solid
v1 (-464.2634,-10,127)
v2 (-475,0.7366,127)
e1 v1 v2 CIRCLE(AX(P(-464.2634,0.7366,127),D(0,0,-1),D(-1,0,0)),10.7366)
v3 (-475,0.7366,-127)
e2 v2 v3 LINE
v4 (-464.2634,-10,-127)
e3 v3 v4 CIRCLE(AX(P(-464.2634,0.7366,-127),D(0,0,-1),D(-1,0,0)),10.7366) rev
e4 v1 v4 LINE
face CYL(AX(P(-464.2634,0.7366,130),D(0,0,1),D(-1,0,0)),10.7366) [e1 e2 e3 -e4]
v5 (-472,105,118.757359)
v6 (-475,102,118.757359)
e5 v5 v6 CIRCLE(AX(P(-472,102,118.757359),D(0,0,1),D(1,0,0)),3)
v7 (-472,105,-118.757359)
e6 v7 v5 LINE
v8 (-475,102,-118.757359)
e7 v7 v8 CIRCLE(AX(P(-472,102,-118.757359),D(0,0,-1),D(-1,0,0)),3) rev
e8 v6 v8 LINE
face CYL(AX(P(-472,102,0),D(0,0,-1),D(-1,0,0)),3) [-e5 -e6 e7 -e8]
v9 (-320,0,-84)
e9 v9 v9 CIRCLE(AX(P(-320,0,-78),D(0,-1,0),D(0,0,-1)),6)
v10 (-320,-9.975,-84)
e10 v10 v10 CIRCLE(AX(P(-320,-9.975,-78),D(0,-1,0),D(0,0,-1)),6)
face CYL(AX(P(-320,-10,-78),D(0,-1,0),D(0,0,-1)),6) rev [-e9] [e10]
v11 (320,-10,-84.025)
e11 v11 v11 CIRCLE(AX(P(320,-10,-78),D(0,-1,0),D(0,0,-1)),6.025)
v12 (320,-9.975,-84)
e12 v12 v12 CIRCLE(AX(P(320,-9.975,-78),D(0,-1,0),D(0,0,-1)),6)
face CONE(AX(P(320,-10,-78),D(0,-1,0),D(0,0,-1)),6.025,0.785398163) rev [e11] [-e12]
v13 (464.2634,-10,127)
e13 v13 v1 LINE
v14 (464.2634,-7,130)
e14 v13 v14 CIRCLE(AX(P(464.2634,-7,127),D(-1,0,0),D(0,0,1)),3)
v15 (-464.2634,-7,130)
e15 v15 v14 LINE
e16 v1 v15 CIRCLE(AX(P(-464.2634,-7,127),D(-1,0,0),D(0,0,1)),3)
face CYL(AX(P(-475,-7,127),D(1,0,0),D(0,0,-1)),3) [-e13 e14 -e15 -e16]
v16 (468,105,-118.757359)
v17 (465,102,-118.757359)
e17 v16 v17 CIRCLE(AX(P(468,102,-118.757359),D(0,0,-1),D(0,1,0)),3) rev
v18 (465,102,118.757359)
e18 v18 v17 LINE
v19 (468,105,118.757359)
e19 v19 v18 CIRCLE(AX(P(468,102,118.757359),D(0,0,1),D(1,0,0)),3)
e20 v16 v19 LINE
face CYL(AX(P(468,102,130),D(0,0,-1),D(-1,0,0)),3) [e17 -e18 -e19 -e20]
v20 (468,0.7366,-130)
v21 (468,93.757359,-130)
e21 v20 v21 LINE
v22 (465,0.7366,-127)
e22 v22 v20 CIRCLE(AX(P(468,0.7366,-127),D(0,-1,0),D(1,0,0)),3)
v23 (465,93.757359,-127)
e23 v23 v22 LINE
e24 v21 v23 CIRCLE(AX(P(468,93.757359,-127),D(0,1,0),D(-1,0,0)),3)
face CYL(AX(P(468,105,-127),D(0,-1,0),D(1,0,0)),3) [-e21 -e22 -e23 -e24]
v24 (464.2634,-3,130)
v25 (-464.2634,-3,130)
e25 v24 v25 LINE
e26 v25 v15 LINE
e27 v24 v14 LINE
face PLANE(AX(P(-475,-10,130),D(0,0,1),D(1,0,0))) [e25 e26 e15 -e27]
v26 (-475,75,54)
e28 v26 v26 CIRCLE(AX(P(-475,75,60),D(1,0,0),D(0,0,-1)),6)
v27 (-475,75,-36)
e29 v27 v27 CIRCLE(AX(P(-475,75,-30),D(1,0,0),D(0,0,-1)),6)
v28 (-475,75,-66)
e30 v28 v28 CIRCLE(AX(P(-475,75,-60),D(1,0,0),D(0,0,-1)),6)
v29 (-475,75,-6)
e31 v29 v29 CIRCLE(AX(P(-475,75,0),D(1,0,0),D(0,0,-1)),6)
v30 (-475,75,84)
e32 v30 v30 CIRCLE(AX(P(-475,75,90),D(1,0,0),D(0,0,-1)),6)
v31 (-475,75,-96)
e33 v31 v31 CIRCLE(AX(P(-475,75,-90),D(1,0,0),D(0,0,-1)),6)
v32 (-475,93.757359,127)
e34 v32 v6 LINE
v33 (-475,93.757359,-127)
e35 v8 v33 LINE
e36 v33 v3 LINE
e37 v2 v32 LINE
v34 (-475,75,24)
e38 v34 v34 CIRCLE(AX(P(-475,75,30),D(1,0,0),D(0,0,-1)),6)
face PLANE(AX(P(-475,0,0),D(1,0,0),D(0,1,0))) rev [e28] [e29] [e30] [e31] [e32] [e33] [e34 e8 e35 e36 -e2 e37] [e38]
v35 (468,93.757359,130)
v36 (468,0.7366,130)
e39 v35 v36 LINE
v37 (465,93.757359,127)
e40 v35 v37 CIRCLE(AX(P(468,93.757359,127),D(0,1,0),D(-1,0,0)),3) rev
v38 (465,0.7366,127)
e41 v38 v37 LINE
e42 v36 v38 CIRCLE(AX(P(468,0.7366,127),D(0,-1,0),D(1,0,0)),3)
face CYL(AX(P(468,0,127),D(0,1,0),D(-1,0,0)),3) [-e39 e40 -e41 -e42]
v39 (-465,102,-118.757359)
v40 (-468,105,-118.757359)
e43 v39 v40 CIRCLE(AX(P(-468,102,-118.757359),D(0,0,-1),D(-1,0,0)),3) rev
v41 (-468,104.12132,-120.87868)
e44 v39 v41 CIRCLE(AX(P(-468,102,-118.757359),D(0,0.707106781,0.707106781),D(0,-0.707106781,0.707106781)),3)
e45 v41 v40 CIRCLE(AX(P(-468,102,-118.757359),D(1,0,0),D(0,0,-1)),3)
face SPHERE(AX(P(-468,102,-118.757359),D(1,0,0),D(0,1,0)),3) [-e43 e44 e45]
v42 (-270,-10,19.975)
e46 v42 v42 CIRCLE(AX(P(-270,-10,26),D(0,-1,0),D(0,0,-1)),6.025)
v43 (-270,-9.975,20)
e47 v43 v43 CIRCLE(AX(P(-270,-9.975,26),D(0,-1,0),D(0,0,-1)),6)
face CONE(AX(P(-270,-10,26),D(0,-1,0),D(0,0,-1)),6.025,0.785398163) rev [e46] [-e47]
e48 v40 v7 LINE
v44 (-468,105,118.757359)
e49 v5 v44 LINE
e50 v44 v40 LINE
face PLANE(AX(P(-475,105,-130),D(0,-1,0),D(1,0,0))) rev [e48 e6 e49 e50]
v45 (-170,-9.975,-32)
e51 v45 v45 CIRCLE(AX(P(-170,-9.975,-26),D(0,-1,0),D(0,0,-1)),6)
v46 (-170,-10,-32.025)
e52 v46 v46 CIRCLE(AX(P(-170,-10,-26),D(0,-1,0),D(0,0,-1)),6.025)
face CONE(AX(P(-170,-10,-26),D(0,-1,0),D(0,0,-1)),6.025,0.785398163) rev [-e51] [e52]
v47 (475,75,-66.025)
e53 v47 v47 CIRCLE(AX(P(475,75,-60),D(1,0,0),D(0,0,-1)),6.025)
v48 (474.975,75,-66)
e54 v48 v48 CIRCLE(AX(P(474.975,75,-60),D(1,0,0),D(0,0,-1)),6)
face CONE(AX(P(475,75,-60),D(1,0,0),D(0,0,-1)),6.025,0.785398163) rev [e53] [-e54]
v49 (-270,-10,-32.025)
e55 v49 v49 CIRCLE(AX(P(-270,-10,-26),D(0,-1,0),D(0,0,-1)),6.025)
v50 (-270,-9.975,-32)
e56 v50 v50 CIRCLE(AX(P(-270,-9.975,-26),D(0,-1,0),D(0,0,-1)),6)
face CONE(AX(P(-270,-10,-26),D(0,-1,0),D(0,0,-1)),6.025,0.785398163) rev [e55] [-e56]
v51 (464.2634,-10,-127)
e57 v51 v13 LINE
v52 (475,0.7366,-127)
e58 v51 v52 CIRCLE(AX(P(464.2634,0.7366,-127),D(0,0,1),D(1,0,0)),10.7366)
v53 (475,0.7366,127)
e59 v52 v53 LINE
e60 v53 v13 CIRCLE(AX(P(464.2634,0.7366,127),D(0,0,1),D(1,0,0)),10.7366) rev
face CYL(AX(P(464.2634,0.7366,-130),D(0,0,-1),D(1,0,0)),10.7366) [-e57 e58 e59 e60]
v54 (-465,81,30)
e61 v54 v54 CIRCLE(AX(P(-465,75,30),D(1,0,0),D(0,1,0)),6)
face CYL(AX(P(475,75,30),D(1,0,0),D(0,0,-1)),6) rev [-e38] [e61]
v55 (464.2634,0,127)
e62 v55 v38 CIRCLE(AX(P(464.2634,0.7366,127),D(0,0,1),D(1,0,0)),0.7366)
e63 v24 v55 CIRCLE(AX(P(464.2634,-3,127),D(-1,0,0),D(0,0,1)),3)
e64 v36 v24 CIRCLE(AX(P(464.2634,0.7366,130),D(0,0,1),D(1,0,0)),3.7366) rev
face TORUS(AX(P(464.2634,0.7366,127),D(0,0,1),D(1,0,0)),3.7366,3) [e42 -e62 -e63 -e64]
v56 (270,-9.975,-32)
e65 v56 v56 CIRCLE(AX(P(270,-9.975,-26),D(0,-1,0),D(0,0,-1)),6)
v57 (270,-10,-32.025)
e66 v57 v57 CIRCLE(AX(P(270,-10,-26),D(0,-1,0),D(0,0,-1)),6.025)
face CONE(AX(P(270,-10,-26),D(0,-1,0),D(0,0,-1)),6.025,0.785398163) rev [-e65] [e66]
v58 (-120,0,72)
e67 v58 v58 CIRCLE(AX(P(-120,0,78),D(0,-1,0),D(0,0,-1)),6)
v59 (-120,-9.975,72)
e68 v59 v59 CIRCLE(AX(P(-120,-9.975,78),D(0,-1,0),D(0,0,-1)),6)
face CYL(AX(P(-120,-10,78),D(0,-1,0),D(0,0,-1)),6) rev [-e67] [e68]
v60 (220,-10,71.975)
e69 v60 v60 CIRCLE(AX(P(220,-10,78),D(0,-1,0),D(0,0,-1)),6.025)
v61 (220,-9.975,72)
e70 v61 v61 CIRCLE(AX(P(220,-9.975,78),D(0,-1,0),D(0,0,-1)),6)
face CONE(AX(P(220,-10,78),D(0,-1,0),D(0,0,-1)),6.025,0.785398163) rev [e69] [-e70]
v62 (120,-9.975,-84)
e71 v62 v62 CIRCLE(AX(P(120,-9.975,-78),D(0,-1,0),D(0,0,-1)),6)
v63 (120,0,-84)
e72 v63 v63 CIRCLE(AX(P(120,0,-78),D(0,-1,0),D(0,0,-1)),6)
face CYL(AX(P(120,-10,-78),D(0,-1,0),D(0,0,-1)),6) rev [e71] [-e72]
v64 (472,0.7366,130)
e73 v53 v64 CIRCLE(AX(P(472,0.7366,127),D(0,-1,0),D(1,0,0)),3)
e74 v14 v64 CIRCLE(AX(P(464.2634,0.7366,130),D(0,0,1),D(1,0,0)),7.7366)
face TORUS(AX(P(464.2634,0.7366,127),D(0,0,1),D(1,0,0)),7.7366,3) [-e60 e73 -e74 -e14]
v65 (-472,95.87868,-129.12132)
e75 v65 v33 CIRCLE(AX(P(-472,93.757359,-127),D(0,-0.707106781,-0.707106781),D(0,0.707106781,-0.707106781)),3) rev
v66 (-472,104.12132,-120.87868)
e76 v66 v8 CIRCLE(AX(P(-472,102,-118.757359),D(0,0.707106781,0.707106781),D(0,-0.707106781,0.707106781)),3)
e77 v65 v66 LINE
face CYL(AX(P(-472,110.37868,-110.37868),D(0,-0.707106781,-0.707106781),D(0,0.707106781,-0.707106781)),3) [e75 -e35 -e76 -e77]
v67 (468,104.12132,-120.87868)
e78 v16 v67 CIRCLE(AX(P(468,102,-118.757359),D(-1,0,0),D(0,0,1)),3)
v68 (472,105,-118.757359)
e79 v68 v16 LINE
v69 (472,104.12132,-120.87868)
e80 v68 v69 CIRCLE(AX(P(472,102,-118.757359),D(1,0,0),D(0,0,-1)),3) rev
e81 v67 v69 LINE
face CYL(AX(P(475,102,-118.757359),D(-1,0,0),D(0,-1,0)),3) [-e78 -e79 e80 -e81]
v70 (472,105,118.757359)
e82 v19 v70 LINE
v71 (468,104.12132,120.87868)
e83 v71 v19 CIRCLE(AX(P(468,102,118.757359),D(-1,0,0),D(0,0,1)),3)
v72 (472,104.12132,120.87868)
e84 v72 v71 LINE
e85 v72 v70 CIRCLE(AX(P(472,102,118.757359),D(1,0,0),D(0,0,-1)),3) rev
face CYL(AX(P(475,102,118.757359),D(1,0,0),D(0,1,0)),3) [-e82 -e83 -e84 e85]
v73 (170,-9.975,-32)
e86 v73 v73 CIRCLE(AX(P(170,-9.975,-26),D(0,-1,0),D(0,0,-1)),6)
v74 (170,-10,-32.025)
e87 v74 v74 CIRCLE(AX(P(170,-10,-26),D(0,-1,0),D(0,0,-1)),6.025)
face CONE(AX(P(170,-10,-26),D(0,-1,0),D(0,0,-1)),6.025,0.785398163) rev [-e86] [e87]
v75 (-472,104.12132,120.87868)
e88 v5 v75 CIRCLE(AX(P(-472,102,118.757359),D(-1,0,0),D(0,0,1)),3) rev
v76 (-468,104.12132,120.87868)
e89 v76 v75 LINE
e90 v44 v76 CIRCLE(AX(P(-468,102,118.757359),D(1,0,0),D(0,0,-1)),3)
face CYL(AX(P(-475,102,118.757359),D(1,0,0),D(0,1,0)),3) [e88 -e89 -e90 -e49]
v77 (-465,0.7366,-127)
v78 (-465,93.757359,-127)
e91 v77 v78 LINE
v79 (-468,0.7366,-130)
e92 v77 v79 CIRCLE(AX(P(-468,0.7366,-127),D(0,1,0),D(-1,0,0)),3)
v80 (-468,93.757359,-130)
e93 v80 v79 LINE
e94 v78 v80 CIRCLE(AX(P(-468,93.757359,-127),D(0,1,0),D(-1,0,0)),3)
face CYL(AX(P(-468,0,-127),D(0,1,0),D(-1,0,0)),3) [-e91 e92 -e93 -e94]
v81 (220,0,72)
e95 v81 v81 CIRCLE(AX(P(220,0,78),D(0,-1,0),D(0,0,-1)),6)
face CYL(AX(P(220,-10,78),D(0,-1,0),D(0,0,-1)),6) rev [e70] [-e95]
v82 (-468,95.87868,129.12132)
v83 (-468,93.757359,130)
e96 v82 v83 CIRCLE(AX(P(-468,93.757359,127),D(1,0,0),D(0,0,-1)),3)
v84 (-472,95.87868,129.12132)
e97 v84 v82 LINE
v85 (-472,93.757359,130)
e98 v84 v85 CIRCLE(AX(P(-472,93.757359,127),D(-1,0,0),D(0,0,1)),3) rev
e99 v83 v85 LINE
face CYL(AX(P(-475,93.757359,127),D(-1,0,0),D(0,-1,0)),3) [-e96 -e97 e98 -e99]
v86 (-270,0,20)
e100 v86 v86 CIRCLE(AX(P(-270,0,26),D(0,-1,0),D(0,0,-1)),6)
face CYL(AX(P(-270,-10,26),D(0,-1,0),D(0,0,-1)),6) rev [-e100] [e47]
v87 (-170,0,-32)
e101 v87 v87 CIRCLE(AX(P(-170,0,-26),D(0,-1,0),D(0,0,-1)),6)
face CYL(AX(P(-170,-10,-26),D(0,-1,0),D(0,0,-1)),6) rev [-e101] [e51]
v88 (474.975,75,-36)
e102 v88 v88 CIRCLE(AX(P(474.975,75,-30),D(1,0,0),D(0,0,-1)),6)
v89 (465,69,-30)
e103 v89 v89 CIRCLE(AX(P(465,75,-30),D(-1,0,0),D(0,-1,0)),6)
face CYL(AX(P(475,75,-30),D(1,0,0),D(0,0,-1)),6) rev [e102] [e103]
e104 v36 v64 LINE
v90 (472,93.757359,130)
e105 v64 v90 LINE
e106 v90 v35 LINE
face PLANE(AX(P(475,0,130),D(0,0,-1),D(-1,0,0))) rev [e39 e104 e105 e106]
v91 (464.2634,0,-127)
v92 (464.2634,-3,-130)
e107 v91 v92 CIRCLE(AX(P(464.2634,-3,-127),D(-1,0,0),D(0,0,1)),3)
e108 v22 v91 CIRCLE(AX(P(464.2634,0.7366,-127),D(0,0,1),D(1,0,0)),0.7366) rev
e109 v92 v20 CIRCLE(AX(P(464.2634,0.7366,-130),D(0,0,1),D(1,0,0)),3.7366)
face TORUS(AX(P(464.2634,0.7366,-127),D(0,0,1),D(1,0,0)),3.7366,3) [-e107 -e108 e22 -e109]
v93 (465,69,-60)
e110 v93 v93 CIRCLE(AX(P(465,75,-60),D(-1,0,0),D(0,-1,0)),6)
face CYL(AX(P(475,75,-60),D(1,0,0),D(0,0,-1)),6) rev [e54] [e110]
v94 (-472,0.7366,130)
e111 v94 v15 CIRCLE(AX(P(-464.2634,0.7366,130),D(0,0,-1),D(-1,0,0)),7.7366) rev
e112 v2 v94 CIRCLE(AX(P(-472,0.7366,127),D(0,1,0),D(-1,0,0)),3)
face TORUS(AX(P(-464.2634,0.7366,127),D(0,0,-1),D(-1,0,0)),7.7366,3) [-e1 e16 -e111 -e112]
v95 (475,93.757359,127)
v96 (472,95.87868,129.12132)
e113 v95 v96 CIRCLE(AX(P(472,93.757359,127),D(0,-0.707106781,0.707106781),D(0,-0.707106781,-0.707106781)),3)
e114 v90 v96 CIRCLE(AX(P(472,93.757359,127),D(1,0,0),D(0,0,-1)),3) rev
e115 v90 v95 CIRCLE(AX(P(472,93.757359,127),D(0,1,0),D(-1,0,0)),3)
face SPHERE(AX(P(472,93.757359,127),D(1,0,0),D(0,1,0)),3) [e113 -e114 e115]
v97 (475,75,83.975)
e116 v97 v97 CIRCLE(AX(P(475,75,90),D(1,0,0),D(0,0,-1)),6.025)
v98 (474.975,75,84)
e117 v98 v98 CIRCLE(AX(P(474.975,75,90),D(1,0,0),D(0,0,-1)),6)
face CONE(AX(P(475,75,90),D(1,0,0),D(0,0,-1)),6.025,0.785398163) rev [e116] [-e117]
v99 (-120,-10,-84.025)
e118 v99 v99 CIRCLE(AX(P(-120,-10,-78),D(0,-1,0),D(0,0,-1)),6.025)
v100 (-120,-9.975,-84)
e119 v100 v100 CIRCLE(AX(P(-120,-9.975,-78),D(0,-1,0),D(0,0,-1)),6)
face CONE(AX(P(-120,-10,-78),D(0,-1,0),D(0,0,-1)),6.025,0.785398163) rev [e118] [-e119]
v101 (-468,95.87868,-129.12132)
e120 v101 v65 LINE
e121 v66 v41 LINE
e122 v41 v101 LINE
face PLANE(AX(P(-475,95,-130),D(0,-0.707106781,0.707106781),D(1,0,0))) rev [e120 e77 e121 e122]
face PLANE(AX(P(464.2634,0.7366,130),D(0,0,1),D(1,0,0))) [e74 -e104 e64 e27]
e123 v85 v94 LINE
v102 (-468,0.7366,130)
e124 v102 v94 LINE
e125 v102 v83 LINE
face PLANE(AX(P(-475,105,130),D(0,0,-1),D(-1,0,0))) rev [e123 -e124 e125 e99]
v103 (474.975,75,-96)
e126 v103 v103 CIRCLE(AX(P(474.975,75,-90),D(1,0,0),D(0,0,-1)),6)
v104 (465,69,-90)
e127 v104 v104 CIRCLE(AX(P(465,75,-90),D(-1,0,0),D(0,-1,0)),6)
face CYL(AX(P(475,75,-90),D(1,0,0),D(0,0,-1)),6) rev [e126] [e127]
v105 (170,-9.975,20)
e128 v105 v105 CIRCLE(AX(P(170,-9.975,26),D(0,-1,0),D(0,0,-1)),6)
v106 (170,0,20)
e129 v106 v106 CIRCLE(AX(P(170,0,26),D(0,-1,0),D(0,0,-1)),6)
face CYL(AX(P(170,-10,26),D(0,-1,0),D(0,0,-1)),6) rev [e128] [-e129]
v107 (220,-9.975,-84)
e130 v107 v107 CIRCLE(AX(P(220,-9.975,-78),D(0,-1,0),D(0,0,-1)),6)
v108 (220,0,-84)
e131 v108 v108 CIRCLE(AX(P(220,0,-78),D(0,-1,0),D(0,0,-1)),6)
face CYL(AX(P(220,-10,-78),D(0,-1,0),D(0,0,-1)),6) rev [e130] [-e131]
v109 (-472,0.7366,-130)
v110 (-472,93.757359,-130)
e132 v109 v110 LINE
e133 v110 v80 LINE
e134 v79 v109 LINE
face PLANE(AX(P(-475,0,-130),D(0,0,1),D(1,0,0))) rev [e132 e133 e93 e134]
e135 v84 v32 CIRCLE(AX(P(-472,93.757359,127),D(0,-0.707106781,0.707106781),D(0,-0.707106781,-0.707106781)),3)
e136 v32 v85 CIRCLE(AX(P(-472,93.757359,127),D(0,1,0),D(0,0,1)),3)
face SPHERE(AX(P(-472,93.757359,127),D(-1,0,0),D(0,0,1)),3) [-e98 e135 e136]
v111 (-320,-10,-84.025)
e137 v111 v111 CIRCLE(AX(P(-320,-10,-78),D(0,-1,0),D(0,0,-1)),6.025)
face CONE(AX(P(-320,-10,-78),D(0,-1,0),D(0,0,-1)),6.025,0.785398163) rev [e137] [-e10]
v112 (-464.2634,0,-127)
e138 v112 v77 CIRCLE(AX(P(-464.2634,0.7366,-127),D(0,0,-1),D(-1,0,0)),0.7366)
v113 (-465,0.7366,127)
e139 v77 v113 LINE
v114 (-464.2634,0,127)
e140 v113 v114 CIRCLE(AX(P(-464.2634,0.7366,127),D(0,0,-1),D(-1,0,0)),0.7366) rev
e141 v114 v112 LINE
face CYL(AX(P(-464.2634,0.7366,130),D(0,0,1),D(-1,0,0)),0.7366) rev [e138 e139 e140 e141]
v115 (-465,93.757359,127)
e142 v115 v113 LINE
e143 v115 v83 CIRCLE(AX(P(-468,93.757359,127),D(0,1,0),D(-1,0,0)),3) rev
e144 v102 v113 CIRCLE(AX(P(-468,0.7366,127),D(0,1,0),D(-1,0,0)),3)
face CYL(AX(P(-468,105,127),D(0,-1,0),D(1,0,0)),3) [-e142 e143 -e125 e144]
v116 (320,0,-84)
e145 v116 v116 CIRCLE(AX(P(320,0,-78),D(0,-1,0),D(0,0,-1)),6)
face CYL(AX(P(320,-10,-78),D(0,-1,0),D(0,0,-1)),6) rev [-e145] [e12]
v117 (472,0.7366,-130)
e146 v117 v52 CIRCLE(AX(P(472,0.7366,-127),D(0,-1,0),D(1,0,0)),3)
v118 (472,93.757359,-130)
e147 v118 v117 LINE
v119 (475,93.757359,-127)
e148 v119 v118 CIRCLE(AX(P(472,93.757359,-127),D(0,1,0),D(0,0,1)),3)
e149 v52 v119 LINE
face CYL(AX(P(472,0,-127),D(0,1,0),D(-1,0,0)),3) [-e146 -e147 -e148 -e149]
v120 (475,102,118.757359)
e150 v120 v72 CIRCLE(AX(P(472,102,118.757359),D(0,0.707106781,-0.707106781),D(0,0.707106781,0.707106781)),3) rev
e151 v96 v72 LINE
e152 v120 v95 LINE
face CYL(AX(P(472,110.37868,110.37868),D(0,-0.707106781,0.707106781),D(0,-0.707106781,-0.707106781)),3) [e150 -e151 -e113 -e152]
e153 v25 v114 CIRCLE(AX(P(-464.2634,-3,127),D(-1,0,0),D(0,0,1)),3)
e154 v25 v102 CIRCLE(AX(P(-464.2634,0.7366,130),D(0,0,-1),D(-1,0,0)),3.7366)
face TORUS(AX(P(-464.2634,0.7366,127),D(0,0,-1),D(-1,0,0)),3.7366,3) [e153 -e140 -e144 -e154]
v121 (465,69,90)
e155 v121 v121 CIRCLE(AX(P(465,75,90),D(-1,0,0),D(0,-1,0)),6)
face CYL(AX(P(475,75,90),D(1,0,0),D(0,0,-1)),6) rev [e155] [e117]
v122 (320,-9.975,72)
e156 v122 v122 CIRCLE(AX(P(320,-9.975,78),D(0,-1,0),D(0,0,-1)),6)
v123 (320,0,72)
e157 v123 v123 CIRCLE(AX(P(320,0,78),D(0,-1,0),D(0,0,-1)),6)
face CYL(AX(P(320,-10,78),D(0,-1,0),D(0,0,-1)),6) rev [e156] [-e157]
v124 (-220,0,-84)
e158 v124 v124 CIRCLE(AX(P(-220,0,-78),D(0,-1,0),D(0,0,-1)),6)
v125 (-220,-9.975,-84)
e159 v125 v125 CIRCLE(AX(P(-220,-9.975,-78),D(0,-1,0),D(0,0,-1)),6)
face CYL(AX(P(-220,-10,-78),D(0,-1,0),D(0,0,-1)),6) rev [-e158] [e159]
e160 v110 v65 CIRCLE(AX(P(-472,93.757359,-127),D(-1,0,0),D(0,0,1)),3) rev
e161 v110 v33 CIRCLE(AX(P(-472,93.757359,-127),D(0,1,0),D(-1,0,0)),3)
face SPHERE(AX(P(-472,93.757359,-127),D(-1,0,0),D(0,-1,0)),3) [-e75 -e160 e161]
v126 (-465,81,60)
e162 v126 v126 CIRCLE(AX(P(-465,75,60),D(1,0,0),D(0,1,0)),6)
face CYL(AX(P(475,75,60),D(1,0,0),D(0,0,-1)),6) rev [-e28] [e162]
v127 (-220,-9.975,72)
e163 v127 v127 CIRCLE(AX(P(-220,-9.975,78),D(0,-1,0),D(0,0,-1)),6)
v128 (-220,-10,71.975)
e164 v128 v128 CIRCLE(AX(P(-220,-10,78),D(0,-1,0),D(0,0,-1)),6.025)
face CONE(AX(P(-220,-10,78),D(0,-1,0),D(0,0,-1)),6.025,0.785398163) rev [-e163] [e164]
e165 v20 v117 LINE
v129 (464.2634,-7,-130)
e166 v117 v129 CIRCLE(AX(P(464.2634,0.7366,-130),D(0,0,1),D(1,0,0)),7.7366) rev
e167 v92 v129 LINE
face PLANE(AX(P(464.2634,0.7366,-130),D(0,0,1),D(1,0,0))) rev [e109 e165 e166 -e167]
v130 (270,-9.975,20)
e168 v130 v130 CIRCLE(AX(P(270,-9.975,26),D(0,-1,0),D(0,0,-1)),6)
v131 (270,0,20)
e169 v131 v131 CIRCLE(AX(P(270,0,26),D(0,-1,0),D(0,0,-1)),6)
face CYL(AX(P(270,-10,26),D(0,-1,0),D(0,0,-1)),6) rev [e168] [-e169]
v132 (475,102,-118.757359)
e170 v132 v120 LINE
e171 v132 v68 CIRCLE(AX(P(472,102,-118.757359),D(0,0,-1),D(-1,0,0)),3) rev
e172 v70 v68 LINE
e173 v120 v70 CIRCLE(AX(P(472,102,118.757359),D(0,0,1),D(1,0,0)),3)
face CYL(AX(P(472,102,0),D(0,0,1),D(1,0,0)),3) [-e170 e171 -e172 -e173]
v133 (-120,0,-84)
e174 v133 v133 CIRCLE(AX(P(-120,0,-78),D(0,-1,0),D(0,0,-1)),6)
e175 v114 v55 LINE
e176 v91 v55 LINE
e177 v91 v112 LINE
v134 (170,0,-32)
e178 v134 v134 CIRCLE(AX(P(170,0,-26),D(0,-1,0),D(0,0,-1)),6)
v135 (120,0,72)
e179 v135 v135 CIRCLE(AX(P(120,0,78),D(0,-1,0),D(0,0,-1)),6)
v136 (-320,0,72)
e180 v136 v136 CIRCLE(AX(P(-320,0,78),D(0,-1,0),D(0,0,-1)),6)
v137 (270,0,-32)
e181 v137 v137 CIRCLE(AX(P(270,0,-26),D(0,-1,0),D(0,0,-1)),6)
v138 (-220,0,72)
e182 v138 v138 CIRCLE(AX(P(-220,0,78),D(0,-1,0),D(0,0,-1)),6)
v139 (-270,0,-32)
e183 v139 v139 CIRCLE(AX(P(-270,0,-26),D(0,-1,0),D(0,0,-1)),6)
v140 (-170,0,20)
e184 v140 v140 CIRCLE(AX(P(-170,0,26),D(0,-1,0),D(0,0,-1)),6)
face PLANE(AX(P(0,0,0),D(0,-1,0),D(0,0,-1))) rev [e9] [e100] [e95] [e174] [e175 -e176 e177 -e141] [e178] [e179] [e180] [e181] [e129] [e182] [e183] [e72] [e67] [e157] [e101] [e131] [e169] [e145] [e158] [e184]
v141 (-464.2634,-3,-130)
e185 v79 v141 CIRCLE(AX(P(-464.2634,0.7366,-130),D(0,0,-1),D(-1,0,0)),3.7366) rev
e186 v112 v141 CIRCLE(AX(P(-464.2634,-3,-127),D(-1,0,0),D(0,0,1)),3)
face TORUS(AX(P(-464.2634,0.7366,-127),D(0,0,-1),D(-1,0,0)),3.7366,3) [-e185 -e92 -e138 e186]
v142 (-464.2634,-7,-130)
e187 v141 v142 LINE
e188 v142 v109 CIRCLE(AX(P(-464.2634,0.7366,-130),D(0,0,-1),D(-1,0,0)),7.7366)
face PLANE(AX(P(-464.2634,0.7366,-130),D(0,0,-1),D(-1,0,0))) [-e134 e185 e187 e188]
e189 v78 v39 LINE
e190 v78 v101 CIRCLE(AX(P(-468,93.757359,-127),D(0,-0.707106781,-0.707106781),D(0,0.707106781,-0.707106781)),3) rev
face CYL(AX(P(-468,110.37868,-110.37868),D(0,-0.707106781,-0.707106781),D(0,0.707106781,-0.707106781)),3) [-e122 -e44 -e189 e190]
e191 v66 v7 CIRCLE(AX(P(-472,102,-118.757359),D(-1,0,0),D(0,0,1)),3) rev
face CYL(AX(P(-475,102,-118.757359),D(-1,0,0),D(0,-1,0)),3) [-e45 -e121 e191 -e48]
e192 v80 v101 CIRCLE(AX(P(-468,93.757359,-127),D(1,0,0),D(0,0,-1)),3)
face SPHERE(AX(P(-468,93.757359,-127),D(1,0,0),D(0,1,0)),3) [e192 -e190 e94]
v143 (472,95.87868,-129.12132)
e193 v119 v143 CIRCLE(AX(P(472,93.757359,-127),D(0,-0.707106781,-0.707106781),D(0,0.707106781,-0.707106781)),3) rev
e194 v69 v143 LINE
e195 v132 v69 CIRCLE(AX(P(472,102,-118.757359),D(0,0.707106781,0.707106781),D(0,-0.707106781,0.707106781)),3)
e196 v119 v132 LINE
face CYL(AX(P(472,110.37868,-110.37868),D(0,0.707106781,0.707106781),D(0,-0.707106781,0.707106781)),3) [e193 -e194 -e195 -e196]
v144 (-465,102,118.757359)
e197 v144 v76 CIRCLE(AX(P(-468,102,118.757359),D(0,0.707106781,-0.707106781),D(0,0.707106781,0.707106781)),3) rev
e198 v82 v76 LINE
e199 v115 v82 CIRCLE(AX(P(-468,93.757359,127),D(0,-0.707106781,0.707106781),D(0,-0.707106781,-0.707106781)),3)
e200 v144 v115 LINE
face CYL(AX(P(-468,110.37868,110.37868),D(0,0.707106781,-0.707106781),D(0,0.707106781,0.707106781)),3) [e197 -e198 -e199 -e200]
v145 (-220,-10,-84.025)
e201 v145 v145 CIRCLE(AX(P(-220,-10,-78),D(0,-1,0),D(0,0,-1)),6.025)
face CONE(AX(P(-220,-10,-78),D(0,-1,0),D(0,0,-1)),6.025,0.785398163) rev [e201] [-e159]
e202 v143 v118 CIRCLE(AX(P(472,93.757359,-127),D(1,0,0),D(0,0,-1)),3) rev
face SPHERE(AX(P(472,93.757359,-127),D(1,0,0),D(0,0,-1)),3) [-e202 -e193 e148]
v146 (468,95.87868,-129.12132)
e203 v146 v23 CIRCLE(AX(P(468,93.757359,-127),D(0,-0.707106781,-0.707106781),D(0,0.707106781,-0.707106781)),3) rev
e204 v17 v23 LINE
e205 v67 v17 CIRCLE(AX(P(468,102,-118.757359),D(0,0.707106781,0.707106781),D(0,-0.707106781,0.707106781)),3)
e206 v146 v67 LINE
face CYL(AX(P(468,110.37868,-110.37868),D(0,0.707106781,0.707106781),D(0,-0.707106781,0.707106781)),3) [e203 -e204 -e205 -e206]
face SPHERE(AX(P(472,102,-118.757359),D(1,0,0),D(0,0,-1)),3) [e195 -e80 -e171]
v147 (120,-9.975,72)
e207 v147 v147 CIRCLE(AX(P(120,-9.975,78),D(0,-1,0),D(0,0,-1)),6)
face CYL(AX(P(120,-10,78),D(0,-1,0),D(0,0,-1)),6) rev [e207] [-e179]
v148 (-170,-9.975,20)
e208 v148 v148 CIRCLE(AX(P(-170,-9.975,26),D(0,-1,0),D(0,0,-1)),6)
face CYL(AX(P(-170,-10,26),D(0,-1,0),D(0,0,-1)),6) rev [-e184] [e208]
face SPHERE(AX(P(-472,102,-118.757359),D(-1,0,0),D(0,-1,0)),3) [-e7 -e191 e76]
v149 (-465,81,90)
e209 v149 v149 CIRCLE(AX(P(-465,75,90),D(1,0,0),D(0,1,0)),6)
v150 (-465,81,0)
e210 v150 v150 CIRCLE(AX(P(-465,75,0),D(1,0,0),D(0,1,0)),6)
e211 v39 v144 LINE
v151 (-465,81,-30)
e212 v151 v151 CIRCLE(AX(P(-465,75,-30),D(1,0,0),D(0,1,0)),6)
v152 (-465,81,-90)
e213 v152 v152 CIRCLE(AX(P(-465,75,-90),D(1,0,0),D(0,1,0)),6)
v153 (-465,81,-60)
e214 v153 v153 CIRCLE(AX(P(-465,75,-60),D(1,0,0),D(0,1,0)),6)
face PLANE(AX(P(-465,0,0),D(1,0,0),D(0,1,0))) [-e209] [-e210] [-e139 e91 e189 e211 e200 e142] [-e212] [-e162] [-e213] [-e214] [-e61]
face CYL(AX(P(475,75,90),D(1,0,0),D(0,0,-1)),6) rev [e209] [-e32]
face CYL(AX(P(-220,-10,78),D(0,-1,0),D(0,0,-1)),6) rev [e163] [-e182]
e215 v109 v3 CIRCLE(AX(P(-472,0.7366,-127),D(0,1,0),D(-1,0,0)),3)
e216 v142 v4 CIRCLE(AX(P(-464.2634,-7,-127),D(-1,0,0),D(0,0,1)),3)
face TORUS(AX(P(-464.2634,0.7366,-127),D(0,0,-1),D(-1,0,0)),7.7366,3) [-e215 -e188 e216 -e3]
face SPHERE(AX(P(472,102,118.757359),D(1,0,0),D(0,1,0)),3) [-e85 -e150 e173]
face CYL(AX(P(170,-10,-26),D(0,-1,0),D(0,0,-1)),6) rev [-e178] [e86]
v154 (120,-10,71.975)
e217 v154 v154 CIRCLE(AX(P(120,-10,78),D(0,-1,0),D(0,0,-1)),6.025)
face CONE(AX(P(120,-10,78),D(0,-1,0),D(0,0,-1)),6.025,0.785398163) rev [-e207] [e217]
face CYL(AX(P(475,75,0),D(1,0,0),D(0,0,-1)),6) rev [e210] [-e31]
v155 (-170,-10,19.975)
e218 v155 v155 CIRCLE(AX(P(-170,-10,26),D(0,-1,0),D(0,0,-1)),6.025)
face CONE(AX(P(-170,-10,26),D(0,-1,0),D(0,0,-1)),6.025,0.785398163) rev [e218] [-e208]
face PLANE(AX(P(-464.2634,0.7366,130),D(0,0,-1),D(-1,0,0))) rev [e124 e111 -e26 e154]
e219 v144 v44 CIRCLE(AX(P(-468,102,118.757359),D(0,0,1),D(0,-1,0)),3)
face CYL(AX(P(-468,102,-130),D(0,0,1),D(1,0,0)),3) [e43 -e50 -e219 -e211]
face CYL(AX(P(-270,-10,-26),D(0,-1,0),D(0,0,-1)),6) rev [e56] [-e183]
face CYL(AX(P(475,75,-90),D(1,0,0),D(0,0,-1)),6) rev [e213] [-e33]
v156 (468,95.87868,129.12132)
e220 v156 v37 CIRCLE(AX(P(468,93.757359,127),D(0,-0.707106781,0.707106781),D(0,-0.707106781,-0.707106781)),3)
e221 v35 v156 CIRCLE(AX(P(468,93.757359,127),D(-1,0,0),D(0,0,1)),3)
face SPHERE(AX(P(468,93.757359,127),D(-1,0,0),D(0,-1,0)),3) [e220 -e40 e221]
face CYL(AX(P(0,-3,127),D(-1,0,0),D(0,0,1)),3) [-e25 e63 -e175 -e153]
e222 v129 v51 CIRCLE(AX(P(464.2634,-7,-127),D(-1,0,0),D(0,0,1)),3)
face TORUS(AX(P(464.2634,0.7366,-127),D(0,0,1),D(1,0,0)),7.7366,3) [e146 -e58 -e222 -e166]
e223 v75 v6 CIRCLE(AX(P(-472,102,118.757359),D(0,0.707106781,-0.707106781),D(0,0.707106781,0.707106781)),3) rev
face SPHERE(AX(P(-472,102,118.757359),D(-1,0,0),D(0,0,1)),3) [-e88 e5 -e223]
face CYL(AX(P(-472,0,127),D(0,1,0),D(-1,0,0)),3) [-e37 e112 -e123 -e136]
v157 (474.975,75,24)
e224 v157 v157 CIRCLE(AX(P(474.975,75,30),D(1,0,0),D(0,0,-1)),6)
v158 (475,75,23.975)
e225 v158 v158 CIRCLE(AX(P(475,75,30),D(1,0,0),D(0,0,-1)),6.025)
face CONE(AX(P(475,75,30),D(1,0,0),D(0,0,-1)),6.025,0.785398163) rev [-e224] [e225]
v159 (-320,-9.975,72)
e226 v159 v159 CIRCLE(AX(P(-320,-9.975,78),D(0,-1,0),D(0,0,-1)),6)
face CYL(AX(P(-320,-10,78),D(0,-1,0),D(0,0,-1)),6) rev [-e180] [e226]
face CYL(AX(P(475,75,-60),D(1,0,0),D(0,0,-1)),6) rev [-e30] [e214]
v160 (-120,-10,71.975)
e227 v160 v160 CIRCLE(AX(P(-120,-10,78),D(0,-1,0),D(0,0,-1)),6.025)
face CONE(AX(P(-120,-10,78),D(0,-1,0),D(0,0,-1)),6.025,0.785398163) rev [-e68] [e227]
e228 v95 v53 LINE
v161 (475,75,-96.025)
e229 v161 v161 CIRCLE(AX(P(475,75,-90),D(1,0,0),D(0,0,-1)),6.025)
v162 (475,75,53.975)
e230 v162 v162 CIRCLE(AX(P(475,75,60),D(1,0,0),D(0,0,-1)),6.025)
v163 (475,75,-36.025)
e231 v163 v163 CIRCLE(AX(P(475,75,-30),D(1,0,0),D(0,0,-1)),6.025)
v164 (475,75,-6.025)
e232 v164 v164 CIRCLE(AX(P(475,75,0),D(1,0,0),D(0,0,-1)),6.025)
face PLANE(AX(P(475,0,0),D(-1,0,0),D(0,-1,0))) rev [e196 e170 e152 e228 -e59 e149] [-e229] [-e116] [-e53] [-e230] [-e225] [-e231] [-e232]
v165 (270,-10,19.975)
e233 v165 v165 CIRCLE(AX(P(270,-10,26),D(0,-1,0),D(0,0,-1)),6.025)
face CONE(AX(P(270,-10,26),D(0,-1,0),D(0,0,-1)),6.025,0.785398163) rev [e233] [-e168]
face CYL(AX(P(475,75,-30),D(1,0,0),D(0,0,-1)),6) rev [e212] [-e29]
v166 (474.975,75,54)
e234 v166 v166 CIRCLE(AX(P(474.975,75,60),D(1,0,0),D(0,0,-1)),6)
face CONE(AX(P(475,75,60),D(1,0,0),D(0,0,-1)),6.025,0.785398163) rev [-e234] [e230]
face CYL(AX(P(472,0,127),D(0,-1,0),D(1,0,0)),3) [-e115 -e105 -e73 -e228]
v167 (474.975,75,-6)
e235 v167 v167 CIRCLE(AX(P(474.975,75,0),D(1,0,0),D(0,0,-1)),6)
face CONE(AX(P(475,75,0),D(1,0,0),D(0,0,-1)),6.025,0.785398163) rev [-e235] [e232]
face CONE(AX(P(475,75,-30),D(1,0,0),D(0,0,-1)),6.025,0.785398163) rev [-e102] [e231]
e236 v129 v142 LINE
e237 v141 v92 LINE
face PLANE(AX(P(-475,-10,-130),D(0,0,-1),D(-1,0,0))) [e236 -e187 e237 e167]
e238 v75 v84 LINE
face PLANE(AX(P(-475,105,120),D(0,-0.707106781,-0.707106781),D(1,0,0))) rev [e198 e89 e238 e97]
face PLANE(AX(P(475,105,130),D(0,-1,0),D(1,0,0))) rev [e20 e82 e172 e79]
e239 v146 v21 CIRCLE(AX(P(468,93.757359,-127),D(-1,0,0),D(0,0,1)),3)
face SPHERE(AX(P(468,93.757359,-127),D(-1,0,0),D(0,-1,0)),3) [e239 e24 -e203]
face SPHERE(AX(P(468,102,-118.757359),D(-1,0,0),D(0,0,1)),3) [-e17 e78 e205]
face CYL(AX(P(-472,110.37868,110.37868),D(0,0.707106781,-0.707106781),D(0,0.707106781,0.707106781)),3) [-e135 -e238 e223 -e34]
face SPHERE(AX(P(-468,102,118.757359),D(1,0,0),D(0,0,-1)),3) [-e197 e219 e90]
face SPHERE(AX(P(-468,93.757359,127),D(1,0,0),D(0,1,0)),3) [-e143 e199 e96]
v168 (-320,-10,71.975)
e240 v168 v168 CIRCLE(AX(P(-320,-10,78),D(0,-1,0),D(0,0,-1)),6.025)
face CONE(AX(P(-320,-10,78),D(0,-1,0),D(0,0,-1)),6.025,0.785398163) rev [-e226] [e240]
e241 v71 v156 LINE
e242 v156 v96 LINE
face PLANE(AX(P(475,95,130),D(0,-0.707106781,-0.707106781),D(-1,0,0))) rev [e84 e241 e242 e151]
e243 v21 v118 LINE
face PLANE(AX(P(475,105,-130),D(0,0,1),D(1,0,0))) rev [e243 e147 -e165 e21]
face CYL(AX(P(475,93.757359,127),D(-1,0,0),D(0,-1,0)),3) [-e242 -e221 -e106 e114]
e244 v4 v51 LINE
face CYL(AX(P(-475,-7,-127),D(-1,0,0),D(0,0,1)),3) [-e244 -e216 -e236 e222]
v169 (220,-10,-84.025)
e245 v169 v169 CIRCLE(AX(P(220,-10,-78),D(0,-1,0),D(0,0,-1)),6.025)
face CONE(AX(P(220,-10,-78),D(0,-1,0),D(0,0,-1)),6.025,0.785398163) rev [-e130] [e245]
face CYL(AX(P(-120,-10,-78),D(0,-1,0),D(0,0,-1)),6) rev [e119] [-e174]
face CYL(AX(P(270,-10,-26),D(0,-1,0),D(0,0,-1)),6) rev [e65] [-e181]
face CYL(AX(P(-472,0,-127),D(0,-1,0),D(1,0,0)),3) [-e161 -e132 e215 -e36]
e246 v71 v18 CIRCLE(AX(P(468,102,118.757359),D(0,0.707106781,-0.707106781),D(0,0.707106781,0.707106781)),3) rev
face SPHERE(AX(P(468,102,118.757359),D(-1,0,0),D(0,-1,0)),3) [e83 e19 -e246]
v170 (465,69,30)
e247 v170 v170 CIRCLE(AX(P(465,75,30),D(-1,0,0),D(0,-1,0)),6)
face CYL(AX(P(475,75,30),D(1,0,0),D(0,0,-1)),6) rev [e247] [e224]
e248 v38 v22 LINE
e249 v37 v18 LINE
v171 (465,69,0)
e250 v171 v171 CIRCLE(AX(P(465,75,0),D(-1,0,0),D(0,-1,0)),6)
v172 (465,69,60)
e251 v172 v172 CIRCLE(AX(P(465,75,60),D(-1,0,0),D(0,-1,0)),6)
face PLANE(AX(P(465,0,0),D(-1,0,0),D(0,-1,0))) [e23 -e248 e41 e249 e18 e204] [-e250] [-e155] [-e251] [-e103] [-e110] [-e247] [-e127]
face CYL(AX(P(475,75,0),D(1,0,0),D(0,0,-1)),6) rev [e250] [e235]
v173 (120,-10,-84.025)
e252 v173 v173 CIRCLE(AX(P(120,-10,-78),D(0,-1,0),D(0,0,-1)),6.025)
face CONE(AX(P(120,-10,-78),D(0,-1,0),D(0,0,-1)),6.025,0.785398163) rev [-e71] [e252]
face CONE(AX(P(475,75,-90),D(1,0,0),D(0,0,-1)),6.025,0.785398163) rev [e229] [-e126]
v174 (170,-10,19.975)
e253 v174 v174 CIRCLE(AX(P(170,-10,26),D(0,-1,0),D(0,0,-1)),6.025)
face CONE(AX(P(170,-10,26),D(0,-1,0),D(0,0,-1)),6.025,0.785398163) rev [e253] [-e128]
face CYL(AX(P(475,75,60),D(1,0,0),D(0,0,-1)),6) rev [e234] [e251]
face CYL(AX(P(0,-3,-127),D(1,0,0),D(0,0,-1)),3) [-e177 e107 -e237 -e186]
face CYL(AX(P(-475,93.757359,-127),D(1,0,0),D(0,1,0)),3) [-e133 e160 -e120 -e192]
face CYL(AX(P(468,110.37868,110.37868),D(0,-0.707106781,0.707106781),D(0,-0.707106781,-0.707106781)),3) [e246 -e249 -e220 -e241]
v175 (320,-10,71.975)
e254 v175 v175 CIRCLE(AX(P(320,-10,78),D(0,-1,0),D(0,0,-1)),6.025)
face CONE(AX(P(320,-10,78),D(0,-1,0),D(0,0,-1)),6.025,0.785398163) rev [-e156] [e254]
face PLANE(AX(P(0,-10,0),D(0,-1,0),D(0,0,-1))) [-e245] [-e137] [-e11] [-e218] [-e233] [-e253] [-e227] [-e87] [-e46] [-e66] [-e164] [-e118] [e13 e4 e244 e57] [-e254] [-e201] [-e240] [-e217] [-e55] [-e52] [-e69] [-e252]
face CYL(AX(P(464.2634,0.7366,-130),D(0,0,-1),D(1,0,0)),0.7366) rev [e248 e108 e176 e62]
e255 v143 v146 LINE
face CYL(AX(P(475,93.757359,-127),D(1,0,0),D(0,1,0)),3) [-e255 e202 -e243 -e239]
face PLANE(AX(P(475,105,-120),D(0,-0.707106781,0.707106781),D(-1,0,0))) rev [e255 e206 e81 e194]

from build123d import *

# Parameters (mm, degrees)
SKETCH1_W                       = 950
SKETCH1_H                       = 260
BASE_FLANGE1_DEPTH              = 10
EDGE_FLANGE1_STRIP_W            = 41.4732
EDGE_FLANGE1_STRIP_H            = 10
EDGE_FLANGE1_STRIP_CUT_DEPTH    = 260
EDGE_FLANGE1_STRIP_2_W          = 41.4732
EDGE_FLANGE1_STRIP_2_H          = 10
EDGE_FLANGE1_STRIP_CUT_2_DEPTH  = 260
EDGE_FLANGE1_DEPTH              = 260
EDGE_FLANGE1_BEND_DEPTH         = 260
BREAK_CORNER1_START             = -475
BREAK_CORNER1_DEPTH             = 950
M10_CLEARANCE_HOLE1_D           = 12
M10_CLEARANCE_HOLE1_CSINK_D     = 12.05
M10_CLEARANCE_HOLE1_CSINK_ANGLE = 90
M10_CLEARANCE_HOLE2_D           = 12
M10_CLEARANCE_HOLE2_CSINK_D     = 12.05
M10_CLEARANCE_HOLE2_CSINK_ANGLE = 90
FILLET1_R                       = 3


# Read off the part's stored shape, not the designer's step: Break-Corner1
# Sheet-metal steps are written as plain solids
with BuildPart() as part:
    # Sketch1 → Base-Flange1 (new body)
    with BuildSketch(Plane(origin=(0, 0, 0), x_dir=(1, 0, 0), z_dir=(0, 1, 0))):
        Rectangle(SKETCH1_W, SKETCH1_H)
    extrude(amount=-BASE_FLANGE1_DEPTH)

    # Edge-Flange1 strip (across the edge) → Edge-Flange1 strip cut (cut)
    with BuildSketch(Plane(origin=(-475, 0, -130), x_dir=(1, 0, 0), z_dir=(0, 0, 1))):
        with Locations((-10, -5)):
            Rectangle(EDGE_FLANGE1_STRIP_W, EDGE_FLANGE1_STRIP_H)
    extrude(amount=EDGE_FLANGE1_STRIP_CUT_DEPTH, mode=Mode.SUBTRACT)

    # Edge-Flange1 strip 2 (across the edge) → Edge-Flange1 strip cut 2 (cut)
    with BuildSketch(Plane(origin=(475, 0, 130), x_dir=(-1, 0, 0), z_dir=(0, 0, -1))):
        with Locations((-10, -5)):
            Rectangle(EDGE_FLANGE1_STRIP_2_W, EDGE_FLANGE1_STRIP_2_H)
    extrude(amount=EDGE_FLANGE1_STRIP_CUT_2_DEPTH, mode=Mode.SUBTRACT)

    # Edge-Flange1 section (across the edge) → Edge-Flange1 (add)
    with BuildSketch(Plane(origin=(-475, 0, -130), x_dir=(1, 0, 0), z_dir=(0, 0, 1))):
        with BuildLine():
            Line((0, 0.7366), (0, 105))
            Line((0, 105), (10, 105))
            Line((10, 105), (10, 0.7366))
            ThreePointArc((10, 0.7366), (10.215745145, 0.215745145), (10.7366, 0))
            Line((10.7366, 0), (10.7366, -10))
            ThreePointArc((10.7366, -10), (3.144677333, -6.855322667), (0, 0.7366))
        make_face()
    extrude(amount=EDGE_FLANGE1_DEPTH)

    # Edge-Flange1 section 2 (across the edge) → Edge-Flange1 bend (add)
    with BuildSketch(Plane(origin=(475, 0, 130), x_dir=(-1, 0, 0), z_dir=(0, 0, -1))):
        with BuildLine():
            Line((0, 0.7366), (0, 105))
            Line((0, 105), (10, 105))
            Line((10, 105), (10, 0.7366))
            ThreePointArc((10, 0.7366), (10.215745145, 0.215745145), (10.7366, 0))
            Line((10.7366, 0), (10.7366, -10))
            ThreePointArc((10.7366, -10), (3.144677333, -6.855322667), (0, 0.7366))
        make_face()
    extrude(amount=EDGE_FLANGE1_BEND_DEPTH)

    # Break-Corner1 outline → Break-Corner1 (cut)
    with BuildSketch(Plane.YZ.offset(BREAK_CORNER1_START)):
        Polygon((105, 130), (95, 130), (105, 120), align=None)
        Polygon((105, -130), (105, -120), (95, -130), align=None)
    extrude(amount=BREAK_CORNER1_DEPTH, mode=Mode.SUBTRACT)

    # M10 Clearance Hole1 (through all)
    with Locations(Plane(origin=(475, 0, 0), x_dir=(0, 0, -1), z_dir=(1, 0, 0))):
        with Locations((-90, 75), (-60, 75), (-30, 75), (0, 75), (30, 75), (60, 75), (90, 75)):
            CounterSinkHole(M10_CLEARANCE_HOLE1_D / 2, M10_CLEARANCE_HOLE1_CSINK_D / 2, counter_sink_angle=M10_CLEARANCE_HOLE1_CSINK_ANGLE)

    # M10 Clearance Hole2 (through all)
    with Locations(Plane(origin=(0, -10, 0), x_dir=(-1, 0, 0), z_dir=(0, -1, 0))):
        with Locations((-320, 78), (-220, 78), (-120, 78), (-270, 26), (-170, 26), (-270, -26), (-170, -26), (-320, -78), (-220, -78), (-120, -78)):
            m10_clearance_hole2 = CounterSinkHole(M10_CLEARANCE_HOLE2_D / 2, M10_CLEARANCE_HOLE2_CSINK_D / 2, counter_sink_angle=M10_CLEARANCE_HOLE2_CSINK_ANGLE)

    # Mirror1: M10 Clearance Hole2 across plane
    add(m10_clearance_hole2.mirror(Plane(origin=(0, 0, 0), x_dir=(0, 0, 1), z_dir=(1, 0, 0))), mode=Mode.SUBTRACT)

    # Fillet1
    fillet1_edges = [part.edges().sort_by_distance(p)[0] for p in [
        (465, 100, 125),
        (470, 105, 120),
        (475, 100, 125),
        (0, 0, 130),
        (0, -10, 130),
        (0, 0, -130),
        (0, -10, -130),
        (-471.855322667, -6.855322667, -130),
        (-471.855322667, -6.855322667, 130),
        (-464.784254855, 0.215745145, -130),
        (-464.784254855, 0.215745145, 130),
        (-465, 47.8683, 130),
        (-475, 47.8683, 130),
        (471.855322667, -6.855322667, 130),
        (471.855322667, -6.855322667, -130),
        (464.784254855, 0.215745145, 130),
        (464.784254855, 0.215745145, -130),
        (465, 47.8683, -130),
        (475, 47.8683, -130),
        (-465, 105, 0),
        (-475, 105, 0),
        (-470, 105, 120),
        (-465, 100, 125),
        (-470, 95, 130),
        (-475, 100, 125),
        (-475, 47.8683, -130),
        (-465, 47.8683, -130),
        (-470, 95, -130),
        (-465, 100, -125),
        (-470, 105, -120),
        (-475, 100, -125),
        (465, 105, 0),
        (475, 105, 0),
        (470, 105, -120),
        (465, 100, -125),
        (470, 95, -130),
        (475, 100, -125),
        (475, 47.8683, 130),
        (465, 47.8683, 130),
        (470, 95, 130),
    ]]
    fillet(fillet1_edges, radius=FILLET1_R)


solid = part.part
